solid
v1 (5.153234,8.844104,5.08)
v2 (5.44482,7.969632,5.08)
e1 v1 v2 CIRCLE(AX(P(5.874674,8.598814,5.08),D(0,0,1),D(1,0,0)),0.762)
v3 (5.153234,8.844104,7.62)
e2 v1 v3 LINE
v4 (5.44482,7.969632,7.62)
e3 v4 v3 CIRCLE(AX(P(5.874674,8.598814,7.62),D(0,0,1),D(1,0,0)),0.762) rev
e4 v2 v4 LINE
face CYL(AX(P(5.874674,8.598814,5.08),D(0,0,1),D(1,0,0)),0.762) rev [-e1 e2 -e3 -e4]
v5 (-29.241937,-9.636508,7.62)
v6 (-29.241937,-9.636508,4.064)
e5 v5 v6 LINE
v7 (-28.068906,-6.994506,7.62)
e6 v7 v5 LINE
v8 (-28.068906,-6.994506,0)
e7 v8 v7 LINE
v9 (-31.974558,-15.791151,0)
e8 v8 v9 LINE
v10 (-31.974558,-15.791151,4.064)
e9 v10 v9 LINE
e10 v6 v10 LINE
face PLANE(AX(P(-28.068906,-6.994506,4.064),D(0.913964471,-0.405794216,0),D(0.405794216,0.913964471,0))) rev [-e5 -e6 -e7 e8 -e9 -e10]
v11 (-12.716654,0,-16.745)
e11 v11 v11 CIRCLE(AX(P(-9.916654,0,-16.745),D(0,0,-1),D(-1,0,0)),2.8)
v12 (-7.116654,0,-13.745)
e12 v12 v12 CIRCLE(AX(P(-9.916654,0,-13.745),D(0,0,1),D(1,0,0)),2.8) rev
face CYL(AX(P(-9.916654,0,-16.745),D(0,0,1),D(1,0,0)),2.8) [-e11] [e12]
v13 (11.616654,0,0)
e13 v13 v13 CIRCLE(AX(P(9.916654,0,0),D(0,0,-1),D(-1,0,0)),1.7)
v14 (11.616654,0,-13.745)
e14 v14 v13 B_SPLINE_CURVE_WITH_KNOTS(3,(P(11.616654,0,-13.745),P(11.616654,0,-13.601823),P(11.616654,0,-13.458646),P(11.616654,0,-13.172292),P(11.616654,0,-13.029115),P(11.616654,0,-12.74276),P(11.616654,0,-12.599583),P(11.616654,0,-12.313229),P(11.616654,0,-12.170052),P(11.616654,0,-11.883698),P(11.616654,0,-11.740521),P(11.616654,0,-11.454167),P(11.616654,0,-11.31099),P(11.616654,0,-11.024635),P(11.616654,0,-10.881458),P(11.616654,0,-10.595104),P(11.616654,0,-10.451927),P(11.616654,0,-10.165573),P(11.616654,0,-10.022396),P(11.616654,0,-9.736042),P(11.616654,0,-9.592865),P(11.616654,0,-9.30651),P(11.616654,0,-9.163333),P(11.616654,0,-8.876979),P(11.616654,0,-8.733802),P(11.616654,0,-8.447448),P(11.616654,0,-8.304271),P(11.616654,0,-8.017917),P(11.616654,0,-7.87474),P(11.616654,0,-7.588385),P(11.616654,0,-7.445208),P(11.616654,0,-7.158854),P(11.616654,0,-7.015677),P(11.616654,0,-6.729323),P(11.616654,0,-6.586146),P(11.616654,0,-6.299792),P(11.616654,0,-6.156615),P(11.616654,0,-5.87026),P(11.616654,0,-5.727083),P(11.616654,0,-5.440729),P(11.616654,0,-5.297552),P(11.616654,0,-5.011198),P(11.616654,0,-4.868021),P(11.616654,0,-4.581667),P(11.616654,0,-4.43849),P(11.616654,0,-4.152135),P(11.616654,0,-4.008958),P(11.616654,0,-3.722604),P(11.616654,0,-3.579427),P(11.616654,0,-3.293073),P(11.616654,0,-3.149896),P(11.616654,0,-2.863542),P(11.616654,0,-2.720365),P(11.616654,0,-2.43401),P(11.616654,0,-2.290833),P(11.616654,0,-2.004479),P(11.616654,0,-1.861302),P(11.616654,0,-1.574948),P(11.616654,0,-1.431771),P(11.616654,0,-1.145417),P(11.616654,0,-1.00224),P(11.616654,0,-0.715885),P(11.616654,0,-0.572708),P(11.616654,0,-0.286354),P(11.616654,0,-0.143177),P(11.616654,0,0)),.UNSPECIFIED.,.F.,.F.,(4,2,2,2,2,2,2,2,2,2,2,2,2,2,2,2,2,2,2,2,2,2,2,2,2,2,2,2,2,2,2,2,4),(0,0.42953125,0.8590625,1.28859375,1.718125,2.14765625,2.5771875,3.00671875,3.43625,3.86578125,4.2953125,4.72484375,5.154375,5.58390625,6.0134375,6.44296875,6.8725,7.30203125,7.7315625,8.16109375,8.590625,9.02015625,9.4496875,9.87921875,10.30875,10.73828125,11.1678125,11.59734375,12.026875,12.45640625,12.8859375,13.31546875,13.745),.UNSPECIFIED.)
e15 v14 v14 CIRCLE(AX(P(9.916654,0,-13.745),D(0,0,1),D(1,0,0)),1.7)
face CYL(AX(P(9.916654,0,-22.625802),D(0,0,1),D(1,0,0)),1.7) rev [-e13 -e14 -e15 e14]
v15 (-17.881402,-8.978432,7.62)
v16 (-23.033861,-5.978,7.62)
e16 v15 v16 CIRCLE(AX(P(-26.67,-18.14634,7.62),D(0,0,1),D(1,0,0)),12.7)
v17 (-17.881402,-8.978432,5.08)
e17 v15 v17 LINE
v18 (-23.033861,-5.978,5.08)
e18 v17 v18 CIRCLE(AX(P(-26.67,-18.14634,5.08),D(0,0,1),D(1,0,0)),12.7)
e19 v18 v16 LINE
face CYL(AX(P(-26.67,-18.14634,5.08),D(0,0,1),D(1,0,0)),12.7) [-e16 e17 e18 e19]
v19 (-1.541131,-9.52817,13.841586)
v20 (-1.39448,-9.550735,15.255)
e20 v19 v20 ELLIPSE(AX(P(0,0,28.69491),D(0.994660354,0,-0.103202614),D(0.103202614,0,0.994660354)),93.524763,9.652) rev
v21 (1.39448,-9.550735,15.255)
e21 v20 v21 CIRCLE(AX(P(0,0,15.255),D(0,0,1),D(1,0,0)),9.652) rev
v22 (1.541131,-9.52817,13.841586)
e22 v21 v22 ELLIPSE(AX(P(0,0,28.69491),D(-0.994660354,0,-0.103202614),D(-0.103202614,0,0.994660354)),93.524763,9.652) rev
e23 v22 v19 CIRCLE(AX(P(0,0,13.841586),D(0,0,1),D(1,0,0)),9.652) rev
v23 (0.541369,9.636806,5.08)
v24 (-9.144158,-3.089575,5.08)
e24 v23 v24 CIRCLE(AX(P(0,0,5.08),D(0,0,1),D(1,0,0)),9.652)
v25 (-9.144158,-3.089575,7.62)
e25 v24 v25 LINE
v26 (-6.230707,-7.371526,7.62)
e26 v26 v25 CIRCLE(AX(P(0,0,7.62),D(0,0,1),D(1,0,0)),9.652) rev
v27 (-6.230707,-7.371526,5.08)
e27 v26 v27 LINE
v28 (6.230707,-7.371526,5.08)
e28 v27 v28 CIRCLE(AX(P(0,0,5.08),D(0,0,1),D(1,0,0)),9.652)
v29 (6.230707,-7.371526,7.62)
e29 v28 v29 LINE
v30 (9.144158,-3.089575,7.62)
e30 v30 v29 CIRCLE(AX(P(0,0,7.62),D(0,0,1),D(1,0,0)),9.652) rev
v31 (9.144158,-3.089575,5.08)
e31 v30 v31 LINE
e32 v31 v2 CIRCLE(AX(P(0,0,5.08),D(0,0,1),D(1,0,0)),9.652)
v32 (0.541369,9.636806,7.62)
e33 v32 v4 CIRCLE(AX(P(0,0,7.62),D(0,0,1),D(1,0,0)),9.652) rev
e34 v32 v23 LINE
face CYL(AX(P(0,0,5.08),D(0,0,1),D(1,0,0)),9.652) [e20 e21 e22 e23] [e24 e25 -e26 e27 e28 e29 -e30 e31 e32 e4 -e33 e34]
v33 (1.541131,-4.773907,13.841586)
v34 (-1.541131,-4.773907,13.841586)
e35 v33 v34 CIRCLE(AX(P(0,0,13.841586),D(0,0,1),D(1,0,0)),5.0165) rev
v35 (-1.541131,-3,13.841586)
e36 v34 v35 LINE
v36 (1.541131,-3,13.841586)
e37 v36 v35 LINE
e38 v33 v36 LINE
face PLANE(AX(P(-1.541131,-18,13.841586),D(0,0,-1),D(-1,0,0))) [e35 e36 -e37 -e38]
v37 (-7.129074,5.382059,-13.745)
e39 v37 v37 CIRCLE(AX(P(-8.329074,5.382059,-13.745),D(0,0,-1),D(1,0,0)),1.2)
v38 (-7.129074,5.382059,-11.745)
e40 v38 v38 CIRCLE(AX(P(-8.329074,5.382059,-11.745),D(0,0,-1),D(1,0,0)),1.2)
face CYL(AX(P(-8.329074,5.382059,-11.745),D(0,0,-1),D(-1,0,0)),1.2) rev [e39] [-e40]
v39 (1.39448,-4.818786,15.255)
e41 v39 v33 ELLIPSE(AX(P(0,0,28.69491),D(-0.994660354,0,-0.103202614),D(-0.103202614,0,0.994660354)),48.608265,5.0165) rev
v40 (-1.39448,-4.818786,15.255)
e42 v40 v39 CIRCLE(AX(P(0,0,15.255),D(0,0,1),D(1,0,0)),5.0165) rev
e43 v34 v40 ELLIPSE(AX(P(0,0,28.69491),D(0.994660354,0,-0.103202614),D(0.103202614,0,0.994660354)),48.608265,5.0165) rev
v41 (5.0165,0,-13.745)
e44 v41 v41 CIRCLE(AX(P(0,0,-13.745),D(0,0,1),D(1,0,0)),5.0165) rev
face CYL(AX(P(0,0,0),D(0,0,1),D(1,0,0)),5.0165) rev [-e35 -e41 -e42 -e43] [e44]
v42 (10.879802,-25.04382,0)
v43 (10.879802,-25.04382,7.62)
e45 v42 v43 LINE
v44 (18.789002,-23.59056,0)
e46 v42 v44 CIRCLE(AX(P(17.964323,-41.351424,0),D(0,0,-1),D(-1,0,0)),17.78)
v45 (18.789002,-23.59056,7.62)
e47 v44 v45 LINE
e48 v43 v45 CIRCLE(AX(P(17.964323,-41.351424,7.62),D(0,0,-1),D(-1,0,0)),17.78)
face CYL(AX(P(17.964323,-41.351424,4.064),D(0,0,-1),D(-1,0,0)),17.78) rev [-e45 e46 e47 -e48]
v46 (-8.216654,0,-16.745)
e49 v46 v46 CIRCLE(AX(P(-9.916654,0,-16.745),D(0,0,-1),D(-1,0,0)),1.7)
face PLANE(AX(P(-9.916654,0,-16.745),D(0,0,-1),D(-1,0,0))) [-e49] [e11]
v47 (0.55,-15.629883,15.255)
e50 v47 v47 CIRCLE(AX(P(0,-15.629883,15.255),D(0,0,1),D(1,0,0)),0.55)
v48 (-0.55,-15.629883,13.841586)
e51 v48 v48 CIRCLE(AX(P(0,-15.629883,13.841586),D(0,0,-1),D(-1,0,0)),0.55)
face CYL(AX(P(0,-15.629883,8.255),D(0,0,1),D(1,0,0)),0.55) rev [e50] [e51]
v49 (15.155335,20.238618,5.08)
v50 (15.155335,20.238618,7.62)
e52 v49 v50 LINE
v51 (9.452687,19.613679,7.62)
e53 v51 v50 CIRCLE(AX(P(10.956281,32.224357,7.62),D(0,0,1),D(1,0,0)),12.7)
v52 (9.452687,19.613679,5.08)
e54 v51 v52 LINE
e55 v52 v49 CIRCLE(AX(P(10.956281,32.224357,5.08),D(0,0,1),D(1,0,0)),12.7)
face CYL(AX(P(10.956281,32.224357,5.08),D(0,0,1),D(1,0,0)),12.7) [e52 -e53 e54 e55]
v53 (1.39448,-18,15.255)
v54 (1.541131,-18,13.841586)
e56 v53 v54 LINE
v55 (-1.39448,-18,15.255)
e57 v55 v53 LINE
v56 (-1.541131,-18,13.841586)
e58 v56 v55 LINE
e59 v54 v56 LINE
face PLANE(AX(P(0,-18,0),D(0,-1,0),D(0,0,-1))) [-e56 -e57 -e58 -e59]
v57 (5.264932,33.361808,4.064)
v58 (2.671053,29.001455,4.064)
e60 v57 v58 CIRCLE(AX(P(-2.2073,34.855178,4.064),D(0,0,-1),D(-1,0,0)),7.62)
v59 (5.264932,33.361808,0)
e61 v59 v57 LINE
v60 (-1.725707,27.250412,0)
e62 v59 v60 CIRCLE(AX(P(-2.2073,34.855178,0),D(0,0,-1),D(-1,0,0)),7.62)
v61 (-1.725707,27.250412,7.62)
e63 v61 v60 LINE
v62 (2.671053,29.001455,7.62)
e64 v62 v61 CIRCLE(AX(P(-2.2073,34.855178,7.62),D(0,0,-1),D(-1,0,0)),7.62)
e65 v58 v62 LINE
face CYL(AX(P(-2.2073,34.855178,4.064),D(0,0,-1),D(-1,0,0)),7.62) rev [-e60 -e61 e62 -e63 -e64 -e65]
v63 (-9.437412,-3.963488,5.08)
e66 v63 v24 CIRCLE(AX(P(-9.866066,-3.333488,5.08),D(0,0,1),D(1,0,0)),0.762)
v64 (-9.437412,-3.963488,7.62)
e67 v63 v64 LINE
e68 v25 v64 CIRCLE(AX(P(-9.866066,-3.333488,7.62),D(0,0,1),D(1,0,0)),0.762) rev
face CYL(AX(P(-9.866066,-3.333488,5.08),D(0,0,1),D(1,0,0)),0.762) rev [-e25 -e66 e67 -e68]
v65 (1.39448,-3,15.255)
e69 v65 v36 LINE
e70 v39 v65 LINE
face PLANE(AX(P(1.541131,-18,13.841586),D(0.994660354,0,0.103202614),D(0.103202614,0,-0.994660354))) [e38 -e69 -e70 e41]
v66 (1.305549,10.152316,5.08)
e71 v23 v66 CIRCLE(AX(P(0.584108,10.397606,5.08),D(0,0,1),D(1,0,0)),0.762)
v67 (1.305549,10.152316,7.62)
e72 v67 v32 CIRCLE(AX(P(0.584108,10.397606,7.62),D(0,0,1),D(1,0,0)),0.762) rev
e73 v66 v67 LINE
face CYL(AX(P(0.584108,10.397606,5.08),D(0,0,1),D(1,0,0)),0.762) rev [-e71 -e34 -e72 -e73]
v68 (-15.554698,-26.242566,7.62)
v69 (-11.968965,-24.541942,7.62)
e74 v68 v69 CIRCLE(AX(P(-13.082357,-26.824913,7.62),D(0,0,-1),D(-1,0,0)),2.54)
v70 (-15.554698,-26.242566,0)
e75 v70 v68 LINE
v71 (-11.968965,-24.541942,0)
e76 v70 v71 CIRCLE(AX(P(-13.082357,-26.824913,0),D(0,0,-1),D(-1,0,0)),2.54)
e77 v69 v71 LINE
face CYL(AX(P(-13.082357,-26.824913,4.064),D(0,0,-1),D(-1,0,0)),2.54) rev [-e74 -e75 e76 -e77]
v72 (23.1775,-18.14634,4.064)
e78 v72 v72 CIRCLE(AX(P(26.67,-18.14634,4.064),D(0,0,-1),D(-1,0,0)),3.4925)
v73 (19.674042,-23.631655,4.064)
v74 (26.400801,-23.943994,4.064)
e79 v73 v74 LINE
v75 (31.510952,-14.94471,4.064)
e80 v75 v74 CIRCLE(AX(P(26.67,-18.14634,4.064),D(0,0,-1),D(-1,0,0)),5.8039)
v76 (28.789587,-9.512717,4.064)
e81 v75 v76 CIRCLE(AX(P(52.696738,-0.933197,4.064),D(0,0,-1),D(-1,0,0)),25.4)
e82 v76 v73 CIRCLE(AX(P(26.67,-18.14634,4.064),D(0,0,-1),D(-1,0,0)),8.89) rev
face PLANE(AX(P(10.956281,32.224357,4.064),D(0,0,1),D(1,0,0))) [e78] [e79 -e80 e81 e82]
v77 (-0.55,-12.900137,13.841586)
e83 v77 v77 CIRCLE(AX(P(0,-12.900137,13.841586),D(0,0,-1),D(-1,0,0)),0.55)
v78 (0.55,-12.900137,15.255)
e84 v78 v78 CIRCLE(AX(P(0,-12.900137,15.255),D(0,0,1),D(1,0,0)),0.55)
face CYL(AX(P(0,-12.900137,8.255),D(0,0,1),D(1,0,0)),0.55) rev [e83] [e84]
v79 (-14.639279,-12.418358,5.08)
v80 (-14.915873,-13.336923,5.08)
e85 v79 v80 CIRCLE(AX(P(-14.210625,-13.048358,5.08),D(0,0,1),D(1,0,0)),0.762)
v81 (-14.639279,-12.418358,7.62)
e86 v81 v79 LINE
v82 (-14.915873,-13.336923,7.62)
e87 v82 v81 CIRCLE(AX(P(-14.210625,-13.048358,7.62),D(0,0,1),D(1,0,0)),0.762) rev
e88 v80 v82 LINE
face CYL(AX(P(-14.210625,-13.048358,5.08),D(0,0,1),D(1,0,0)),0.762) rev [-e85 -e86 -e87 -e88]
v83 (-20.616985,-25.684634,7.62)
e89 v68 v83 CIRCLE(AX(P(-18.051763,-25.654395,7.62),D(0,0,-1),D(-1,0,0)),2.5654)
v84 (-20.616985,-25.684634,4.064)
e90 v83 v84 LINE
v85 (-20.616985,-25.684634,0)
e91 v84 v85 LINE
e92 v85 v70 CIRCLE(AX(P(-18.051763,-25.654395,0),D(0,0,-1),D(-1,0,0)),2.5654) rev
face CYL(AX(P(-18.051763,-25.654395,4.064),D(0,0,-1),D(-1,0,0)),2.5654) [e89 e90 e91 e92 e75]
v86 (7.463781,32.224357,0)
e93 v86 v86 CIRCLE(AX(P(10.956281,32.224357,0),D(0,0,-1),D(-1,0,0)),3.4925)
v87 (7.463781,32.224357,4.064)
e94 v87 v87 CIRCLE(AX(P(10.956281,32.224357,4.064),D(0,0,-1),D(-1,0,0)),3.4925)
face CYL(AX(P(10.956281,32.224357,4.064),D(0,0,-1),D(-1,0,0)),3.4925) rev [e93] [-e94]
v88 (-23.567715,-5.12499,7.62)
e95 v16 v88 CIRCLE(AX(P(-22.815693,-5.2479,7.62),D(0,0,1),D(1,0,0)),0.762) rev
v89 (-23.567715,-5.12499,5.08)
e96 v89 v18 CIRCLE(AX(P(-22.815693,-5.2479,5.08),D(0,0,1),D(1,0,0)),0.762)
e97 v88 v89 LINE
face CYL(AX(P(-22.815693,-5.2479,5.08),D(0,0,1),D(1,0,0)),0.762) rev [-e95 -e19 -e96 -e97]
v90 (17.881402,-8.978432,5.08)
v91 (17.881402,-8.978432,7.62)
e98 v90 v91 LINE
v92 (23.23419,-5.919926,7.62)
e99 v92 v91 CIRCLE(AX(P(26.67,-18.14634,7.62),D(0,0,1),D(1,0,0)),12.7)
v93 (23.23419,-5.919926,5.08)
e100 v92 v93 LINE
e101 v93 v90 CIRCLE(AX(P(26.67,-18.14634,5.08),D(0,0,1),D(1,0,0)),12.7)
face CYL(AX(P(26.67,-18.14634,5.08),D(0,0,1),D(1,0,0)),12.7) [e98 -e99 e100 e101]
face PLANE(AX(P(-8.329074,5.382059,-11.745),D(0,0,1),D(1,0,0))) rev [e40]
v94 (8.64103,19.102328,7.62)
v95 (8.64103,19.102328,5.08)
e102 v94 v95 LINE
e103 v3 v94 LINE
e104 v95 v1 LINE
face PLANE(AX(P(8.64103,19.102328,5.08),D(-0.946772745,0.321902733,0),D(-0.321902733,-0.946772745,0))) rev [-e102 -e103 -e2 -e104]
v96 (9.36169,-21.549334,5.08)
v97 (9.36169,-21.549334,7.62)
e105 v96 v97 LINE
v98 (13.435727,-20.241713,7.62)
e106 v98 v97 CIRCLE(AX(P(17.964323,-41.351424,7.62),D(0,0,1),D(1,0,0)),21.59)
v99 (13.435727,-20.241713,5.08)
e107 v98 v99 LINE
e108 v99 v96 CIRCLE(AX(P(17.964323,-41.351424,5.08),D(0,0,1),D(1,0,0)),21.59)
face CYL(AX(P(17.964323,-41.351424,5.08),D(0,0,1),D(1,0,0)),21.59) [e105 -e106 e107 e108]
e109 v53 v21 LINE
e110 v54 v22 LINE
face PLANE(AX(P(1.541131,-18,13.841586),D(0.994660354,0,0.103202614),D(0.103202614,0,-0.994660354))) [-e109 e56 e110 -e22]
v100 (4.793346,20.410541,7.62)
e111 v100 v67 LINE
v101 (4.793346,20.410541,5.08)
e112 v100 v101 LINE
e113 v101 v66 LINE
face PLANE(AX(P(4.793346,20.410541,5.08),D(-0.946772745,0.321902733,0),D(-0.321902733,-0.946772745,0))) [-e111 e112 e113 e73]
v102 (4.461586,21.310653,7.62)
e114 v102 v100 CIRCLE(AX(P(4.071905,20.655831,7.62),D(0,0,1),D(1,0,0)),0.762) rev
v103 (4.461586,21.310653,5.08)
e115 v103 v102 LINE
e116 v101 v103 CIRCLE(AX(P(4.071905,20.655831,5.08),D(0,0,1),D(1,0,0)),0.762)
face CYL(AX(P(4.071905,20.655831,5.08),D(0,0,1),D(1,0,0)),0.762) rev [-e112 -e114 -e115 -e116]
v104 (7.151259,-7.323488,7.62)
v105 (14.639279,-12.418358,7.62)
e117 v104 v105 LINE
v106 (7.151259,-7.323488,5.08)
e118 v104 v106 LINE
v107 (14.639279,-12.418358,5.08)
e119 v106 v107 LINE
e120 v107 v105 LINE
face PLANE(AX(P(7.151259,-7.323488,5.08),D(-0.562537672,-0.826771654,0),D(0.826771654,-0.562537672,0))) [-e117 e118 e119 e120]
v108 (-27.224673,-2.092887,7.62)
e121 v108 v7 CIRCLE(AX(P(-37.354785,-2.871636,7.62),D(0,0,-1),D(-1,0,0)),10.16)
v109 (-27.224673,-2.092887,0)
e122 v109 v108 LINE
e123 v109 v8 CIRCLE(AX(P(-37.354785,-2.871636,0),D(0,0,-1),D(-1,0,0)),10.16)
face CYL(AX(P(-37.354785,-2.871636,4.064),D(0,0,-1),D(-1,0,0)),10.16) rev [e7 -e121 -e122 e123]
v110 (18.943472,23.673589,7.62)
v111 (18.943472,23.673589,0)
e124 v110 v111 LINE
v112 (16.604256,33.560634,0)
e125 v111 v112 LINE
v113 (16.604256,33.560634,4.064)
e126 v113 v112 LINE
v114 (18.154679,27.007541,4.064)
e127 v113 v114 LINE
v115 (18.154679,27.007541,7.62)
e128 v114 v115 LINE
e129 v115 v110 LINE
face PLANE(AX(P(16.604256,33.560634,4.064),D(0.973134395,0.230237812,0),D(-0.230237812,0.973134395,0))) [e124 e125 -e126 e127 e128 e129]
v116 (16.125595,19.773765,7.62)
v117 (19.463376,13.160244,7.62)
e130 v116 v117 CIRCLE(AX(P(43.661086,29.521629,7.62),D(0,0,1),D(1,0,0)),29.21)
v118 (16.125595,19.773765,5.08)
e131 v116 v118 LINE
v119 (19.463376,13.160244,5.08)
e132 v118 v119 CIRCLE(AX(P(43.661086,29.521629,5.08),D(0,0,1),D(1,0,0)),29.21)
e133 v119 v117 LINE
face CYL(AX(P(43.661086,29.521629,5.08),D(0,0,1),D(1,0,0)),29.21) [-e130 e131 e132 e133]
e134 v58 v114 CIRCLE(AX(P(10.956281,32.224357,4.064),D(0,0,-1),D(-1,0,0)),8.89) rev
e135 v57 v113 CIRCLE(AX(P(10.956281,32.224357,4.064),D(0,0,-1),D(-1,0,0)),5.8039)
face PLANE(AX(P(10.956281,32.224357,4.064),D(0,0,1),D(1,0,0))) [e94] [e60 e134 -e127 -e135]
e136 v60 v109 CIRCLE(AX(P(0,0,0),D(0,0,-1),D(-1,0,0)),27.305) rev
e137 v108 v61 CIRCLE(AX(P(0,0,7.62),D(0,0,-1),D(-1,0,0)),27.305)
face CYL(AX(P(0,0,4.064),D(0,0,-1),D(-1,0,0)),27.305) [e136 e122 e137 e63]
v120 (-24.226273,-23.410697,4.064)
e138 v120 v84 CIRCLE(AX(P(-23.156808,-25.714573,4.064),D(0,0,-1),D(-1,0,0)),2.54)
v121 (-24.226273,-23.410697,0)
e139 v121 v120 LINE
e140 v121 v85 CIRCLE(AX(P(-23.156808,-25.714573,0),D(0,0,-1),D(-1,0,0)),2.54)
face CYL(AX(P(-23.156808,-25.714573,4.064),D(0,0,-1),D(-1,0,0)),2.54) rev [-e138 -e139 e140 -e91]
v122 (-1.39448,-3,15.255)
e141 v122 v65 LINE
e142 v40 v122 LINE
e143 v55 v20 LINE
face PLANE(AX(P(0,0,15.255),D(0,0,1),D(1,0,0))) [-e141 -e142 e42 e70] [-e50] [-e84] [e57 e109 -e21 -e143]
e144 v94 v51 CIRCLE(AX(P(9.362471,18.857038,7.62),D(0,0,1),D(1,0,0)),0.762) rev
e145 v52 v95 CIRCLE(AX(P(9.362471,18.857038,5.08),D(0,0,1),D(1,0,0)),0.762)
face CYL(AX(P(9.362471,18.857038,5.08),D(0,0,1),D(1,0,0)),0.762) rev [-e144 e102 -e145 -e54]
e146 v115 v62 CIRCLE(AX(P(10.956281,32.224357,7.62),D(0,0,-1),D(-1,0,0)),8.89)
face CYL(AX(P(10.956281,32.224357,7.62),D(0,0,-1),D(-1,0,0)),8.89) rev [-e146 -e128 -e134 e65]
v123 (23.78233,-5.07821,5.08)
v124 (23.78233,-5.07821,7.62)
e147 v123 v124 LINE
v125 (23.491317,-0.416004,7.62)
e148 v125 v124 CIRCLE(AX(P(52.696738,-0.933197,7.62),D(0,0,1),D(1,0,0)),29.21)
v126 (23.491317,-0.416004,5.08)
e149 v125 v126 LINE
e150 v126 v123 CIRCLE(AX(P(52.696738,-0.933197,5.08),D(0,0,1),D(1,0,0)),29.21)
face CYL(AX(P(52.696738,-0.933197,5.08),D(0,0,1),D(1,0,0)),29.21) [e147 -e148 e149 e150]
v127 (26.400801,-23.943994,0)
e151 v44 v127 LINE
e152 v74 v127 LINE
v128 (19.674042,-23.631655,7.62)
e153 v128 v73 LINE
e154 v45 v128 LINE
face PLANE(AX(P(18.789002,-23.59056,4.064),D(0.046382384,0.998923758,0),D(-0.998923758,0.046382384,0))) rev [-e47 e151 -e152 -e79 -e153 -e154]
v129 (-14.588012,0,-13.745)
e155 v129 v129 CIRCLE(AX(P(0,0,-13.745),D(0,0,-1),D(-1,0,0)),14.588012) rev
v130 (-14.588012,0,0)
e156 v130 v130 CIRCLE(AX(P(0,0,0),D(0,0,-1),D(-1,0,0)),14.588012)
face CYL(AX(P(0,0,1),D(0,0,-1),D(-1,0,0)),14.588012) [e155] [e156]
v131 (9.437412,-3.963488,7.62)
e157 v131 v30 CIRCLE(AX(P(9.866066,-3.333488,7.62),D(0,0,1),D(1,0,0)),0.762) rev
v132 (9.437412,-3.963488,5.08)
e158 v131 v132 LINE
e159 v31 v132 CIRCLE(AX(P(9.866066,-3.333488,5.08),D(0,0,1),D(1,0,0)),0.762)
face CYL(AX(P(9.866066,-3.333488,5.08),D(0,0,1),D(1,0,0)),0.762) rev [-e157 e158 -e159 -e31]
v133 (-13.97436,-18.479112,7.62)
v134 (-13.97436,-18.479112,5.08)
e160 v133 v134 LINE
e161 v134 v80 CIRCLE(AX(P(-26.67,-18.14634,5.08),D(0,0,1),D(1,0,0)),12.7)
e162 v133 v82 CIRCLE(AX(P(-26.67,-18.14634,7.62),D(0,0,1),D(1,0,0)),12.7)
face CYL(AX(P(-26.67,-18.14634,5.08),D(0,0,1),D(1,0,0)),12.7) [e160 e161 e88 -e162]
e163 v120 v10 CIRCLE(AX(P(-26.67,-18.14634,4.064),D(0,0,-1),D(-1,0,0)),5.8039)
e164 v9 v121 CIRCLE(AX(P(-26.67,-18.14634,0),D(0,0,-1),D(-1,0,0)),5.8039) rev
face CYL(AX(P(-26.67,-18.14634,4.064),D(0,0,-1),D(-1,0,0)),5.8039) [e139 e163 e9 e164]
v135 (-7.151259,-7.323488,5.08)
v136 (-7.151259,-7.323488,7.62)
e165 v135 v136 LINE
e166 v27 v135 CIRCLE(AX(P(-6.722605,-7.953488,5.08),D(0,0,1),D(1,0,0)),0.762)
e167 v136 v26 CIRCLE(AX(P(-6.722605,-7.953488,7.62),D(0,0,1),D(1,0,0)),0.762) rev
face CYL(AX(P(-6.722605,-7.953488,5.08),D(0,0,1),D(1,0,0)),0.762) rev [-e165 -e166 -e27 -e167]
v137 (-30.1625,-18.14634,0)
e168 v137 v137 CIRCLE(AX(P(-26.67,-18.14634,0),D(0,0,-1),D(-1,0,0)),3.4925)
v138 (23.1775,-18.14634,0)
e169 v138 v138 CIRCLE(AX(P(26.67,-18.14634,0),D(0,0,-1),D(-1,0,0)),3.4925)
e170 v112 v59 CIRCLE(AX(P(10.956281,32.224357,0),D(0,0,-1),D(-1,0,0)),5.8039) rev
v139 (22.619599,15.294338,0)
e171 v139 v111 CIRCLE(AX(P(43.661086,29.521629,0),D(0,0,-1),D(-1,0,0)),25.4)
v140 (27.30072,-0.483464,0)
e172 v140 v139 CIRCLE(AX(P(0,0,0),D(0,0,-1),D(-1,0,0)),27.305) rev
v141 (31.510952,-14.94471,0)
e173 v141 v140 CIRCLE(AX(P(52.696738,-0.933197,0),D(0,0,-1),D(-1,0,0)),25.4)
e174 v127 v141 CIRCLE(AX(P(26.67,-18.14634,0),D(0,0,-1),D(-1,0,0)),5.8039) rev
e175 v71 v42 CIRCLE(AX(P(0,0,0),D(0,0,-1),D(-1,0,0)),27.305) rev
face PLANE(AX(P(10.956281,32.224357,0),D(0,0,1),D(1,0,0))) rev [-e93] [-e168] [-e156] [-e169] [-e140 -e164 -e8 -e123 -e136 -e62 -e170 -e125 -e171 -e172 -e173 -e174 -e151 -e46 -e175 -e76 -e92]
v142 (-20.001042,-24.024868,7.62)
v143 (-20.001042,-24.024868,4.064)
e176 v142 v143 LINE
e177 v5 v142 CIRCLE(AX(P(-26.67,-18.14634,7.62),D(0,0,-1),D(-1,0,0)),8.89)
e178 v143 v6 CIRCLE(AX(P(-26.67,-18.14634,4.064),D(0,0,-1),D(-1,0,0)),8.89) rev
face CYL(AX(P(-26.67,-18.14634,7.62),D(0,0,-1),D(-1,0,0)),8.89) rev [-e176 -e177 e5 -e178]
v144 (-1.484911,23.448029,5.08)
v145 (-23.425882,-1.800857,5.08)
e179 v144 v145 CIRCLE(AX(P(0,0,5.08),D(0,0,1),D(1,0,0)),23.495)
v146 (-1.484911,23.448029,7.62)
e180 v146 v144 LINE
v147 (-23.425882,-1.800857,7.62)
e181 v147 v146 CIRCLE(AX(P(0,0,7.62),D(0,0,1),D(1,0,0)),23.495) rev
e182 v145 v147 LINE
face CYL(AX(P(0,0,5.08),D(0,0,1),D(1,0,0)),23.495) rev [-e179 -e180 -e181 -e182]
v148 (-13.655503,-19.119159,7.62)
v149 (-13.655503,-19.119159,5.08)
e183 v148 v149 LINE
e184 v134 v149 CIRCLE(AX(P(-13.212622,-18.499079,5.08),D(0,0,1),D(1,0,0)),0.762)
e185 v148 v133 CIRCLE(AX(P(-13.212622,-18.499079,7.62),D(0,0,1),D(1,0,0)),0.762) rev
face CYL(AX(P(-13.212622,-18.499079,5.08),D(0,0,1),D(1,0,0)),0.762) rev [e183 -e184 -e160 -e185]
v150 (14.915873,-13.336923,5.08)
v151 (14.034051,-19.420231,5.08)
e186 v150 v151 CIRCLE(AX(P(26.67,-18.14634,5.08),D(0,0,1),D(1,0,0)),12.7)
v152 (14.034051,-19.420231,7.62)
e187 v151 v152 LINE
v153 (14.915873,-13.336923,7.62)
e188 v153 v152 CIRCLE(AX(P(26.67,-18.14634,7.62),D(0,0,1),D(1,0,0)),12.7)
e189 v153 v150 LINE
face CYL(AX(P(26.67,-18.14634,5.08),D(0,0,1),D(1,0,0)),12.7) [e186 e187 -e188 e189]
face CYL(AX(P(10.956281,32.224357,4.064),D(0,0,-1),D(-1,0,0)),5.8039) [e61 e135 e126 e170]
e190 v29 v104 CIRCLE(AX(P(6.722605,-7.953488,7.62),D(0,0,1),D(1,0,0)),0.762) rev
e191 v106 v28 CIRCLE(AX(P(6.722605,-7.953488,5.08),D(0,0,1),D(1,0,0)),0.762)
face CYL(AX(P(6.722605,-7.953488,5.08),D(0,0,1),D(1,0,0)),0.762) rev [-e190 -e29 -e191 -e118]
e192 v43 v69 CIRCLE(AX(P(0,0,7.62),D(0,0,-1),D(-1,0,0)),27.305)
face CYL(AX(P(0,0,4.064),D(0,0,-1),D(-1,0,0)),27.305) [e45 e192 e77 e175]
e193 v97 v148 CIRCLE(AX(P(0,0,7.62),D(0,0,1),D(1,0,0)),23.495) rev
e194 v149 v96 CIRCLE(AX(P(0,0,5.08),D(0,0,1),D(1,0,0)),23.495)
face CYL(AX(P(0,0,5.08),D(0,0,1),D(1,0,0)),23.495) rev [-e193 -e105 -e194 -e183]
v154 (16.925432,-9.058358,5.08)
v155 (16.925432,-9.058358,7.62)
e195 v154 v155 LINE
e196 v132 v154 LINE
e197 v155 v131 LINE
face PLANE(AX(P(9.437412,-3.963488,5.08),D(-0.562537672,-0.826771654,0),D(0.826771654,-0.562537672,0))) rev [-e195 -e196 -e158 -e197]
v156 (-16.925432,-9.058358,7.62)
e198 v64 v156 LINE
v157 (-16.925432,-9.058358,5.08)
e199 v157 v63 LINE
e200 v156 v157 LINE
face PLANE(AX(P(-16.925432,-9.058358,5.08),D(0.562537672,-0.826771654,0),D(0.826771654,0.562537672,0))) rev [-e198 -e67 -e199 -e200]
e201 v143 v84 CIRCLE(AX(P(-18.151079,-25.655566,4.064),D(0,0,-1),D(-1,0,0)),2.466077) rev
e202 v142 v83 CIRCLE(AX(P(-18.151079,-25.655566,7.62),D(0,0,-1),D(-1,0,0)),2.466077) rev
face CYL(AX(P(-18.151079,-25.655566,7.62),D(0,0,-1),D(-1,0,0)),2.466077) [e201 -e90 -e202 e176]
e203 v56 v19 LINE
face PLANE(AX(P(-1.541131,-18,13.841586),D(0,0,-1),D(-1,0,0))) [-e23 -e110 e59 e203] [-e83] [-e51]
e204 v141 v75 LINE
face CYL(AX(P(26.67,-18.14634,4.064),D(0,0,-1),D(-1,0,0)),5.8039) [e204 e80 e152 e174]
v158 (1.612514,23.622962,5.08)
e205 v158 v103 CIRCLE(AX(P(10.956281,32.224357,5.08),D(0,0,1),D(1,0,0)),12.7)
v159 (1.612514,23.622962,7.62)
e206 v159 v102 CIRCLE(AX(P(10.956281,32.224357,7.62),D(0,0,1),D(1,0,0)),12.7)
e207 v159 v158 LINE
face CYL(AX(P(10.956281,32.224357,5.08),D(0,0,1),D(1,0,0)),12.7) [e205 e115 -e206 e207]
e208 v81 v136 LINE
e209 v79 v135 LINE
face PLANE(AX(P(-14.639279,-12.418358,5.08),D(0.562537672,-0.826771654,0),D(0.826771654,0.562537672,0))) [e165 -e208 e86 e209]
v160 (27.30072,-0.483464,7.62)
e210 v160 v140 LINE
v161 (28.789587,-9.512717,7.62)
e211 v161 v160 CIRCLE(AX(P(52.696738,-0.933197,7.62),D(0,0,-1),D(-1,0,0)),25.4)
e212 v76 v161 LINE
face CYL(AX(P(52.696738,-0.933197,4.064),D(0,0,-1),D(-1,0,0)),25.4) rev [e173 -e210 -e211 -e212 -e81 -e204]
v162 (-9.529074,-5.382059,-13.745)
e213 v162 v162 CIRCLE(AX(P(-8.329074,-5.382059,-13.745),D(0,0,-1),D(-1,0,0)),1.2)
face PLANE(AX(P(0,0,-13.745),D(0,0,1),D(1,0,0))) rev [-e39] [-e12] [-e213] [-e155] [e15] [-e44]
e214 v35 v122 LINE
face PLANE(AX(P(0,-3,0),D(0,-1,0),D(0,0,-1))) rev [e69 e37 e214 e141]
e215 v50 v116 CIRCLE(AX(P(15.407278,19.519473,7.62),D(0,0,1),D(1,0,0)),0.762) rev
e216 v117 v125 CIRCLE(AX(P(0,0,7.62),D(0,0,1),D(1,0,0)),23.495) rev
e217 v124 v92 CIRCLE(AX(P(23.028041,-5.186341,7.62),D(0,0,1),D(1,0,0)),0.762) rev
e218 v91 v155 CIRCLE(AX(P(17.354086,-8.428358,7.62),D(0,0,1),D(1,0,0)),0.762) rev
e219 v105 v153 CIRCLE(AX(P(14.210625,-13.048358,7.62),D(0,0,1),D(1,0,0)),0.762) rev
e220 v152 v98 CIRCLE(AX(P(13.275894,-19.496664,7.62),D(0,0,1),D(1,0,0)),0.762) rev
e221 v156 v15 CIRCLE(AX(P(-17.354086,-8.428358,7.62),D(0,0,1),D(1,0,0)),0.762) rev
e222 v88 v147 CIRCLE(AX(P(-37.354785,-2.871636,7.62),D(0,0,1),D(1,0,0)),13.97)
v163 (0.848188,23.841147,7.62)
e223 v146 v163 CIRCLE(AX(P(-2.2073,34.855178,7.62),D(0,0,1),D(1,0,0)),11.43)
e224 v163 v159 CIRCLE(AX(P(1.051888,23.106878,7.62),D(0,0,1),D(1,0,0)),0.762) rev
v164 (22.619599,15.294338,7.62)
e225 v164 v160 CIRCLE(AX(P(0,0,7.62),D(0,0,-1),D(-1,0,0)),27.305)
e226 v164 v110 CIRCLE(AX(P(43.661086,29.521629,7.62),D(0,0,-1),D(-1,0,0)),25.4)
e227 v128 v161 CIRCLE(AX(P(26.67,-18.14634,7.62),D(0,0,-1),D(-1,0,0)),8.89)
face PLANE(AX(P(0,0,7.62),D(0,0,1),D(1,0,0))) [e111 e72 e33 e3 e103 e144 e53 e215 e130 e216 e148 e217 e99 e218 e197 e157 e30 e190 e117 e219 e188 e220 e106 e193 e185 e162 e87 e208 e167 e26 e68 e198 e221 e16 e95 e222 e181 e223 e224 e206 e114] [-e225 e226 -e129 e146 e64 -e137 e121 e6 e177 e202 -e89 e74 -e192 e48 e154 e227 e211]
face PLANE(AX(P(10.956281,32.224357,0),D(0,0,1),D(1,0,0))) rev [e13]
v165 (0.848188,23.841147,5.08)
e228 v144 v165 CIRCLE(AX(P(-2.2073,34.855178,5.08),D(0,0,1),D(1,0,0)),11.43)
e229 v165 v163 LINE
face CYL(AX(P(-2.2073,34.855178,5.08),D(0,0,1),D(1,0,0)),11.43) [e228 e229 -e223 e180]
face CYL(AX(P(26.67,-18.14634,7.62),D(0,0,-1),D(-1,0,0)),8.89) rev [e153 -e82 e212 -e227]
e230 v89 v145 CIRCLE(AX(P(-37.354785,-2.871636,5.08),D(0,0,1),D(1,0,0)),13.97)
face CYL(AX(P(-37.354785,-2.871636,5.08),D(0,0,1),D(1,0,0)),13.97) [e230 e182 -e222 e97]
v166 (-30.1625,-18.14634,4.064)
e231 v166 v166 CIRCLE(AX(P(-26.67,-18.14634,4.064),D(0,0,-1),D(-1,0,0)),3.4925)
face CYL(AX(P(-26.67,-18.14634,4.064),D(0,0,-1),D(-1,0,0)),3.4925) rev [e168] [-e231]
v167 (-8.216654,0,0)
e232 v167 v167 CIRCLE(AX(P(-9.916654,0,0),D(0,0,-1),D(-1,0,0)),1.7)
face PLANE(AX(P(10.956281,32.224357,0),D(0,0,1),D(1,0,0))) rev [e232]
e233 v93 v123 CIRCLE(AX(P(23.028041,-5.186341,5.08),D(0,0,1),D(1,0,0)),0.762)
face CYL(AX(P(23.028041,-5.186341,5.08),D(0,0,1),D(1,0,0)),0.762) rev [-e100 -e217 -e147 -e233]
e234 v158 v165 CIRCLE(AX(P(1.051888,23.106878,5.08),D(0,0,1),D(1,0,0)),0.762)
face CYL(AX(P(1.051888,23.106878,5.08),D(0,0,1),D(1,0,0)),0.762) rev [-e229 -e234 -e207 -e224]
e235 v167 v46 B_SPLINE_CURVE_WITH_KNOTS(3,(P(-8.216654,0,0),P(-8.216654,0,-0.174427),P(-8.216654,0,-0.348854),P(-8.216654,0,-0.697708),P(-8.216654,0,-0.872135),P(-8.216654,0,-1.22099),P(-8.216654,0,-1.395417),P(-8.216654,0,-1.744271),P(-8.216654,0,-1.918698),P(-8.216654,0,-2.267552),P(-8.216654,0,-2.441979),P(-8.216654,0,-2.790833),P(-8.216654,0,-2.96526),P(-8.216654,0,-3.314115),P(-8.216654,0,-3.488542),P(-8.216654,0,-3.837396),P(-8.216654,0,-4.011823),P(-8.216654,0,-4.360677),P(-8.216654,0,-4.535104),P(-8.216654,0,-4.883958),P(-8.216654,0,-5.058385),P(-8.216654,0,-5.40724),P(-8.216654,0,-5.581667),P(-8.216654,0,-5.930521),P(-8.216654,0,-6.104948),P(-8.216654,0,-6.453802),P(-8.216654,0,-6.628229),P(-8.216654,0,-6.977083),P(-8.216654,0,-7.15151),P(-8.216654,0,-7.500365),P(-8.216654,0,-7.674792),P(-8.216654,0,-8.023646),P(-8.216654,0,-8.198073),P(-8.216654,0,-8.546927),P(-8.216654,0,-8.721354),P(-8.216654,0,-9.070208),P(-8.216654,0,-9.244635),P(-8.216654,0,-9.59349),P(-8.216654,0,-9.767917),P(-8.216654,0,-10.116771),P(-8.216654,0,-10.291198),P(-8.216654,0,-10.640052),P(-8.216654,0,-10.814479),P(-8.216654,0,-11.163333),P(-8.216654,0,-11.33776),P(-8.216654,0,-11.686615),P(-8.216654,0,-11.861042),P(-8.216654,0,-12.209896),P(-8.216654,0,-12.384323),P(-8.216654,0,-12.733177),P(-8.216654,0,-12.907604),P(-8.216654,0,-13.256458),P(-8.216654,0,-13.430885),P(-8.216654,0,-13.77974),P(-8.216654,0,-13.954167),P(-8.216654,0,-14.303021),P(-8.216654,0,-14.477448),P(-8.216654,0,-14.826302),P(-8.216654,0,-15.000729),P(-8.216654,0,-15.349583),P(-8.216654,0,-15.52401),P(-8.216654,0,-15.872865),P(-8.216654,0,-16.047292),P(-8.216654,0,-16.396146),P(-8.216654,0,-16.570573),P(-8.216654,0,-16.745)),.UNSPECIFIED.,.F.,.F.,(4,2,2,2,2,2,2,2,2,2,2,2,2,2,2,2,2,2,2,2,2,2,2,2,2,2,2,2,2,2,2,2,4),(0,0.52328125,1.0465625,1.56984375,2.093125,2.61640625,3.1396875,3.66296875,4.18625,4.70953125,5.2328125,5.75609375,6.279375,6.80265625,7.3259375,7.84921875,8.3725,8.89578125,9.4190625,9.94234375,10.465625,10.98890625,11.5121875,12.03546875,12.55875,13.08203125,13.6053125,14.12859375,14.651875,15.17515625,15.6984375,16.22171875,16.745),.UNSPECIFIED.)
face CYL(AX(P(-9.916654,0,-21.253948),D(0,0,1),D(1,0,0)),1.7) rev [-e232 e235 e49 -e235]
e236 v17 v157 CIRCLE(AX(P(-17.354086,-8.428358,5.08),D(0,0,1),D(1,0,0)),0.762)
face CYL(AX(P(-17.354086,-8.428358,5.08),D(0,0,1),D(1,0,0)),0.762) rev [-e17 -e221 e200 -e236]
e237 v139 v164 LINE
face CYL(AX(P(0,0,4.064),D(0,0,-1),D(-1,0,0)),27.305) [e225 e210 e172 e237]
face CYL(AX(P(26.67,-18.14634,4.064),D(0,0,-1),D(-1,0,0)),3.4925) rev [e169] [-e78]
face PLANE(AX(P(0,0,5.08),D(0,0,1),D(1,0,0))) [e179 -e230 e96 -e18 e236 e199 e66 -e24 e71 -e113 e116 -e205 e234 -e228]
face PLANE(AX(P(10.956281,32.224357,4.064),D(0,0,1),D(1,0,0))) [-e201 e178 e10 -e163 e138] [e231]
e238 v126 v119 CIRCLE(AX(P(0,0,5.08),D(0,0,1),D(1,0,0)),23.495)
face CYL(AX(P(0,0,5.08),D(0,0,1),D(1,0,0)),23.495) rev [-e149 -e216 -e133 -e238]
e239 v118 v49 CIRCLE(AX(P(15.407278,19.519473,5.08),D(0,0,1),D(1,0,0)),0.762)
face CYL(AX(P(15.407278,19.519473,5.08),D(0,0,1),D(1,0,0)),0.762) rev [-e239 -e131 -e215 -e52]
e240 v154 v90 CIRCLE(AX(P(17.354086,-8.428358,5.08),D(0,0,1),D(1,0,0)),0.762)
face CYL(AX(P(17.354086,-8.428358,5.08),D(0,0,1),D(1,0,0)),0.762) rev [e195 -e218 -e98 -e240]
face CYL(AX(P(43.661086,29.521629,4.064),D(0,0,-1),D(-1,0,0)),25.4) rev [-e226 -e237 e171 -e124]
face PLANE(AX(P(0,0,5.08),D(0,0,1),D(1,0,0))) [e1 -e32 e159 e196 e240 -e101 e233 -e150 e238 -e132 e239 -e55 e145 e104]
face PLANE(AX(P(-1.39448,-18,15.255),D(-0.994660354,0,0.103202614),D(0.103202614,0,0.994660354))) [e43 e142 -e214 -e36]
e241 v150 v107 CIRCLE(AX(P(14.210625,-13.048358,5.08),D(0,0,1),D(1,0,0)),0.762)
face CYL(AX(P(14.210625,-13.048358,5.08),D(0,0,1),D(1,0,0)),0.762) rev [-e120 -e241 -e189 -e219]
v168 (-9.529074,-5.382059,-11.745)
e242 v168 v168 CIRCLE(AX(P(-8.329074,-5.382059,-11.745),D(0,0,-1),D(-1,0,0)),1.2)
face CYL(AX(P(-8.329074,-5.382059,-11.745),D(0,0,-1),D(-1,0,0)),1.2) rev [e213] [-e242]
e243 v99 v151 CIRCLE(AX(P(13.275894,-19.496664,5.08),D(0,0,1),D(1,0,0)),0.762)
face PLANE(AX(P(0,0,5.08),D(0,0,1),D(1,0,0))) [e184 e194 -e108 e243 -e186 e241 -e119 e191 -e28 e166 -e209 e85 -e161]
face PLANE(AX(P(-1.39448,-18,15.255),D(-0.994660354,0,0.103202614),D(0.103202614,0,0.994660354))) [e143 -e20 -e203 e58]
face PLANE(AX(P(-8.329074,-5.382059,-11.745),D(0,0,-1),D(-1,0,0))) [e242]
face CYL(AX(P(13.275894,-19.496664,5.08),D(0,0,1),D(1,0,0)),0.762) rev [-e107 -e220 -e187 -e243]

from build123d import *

# Parameters (mm, degrees)
EXTRUDE_START           = -5.08
EXTRUDE_1_OUTLINE_R     = 5.0165
EXTRUDE_1_DEPTH         = 5.08
EXTRUDE_1_2_OUTLINE_R   = 14.588011588
EXTRUDE_1_2_OUTLINE_R_2 = 2.268804718
EXTRUDE_1_2_OUTLINE_R_3 = 5.0165
EXTRUDE_1_2_OUTLINE_R_4 = 1.7
EXTRUDE_1_2_DEPTH       = 13.745
EXTRUDE_START_2         = -7.62
EXTRUDE_1_3_OUTLINE_R   = 5.0165
EXTRUDE_1_3_DEPTH       = 2.54
EXTRUDE_START_3         = -15.255
EXTRUDE_1_4_OUTLINE_R   = 9.652
EXTRUDE_1_4_OUTLINE_R_2 = 5.0165
EXTRUDE_1_4_DEPTH       = 7.635
EXTRUDE_START_4         = -4.064
EXTRUDE_1_5_OUTLINE_R   = 3.4925
EXTRUDE_1_5_DEPTH       = 4.064
SKETCH_2_R              = 3.139837575
SKETCH_2_R_2            = 1.7
EXTRUDE_2_DEPTH         = 13.745
SKETCH_3_R              = 1.2
CUT_EXTRUDE_1_DEPTH     = 2
SKETCH_4_R              = 2.8
SKETCH_4_R_2            = 1.7
EXTRUDE_3_DEPTH         = 3
CUT_EXTRUDE_2_DEPTH     = 11
EXTRUDE_4_DEPTH         = 7
EXTRUDE_4_DEPTH_BACK    = 8
SKETCH_8_R              = 0.55
CUT_EXTRUDE_3_DEPTH     = 7


with BuildPart() as part:
    # 凸台-拉伸1: read off the stored shape, not the designer's step
    # 凸台-拉伸1 outline → 凸台-拉伸1 (new body)
    with BuildSketch(Plane(origin=(0, 0, 0), x_dir=(-1, 0, 0), z_dir=(0, 0, -1)).offset(EXTRUDE_START)):
        with BuildLine():
            ThreePointArc((20.001041548, -24.024868384), (19.189851545, -13.342229592), (29.241937464, -9.636508412))
            Line((29.241937464, -9.636508412), (28.068905544, -6.994505511))
            ThreePointArc((28.068905544, -6.994505511), (27.342210837, -4.596155707), (27.224673499, -2.092887453))
            ThreePointArc((27.224673499, -2.092887453), (20.610396453, 17.910180989), (1.725707135, 27.250412105))
            ThreePointArc((1.725707135, 27.250412105), (-0.612060573, 27.775940536), (-2.671053319, 29.001455474))
            ThreePointArc((-2.671053319, 29.001455474), (-9.820841475, 23.407165066), (-18.154679086, 27.007540952))
            Line((-18.154679086, 27.007540952), (-18.943472312, 23.673588932))
            ThreePointArc((-18.943472312, 23.673588932), (-20.401103388, 19.31706117), (-22.619598737, 15.294338102))
            ThreePointArc((-22.619598737, 15.294338102), (-26.177171365, 7.766513011), (-27.300719551, -0.483463539))
            ThreePointArc((-27.300719551, -0.483463539), (-27.635164342, -5.065694963), (-28.789587413, -9.512717058))
            ThreePointArc((-28.789587413, -9.512717058), (-19.201342403, -13.324384855), (-19.674042111, -23.631654559))
            Line((-19.674042111, -23.631654559), (-18.789002246, -23.590560073))
            ThreePointArc((-18.789002246, -23.590560073), (-14.751162948, -23.864172006), (-10.879801534, -25.043820467))
            ThreePointArc((-10.879801534, -25.043820467), (0.599616353, -27.298415434), (11.968964894, -24.54194174))
            ThreePointArc((11.968964894, -24.54194174), (14.170803819, -24.529943899), (15.554698359, -26.242566013))
            ThreePointArc((15.554698359, -26.242566013), (18.332802908, -28.204355062), (20.616984936, -25.68463412))
            ThreePointArc((20.616984936, -25.68463412), (20.463088042, -24.797573692), (20.001041548, -24.024868384))
        make_face()
        Circle(EXTRUDE_1_OUTLINE_R, mode=Mode.SUBTRACT)
    extrude(amount=EXTRUDE_1_DEPTH)

    # Extrude 1 2 outline → Extrude 1 2 (add)
    with BuildSketch(Plane(origin=(0, 0, 0), x_dir=(-1, 0, 0), z_dir=(0, 0, -1))):
        Circle(EXTRUDE_1_2_OUTLINE_R)
        with Locations((-9.916654285, 0)):
            Circle(EXTRUDE_1_2_OUTLINE_R_2, mode=Mode.SUBTRACT)
        Circle(EXTRUDE_1_2_OUTLINE_R_3, mode=Mode.SUBTRACT)
        with Locations((9.916654285, 0)):
            Circle(EXTRUDE_1_2_OUTLINE_R_4, mode=Mode.SUBTRACT)
    extrude(amount=EXTRUDE_1_2_DEPTH)

    # Extrude 1 3 outline → Extrude 1 3 (add)
    with BuildSketch(Plane(origin=(0, 0, 0), x_dir=(-1, 0, 0), z_dir=(0, 0, -1)).offset(EXTRUDE_START_2)):
        with BuildLine():
            ThreePointArc((20.001041548, -24.024868384), (19.189851545, -13.342229592), (29.241937464, -9.636508412))
            Line((29.241937464, -9.636508412), (28.068905544, -6.994505511))
            ThreePointArc((28.068905544, -6.994505511), (27.342210837, -4.596155707), (27.224673499, -2.092887453))
            ThreePointArc((27.224673499, -2.092887453), (20.610396453, 17.910180989), (1.725707135, 27.250412105))
            ThreePointArc((1.725707135, 27.250412105), (-0.612060573, 27.775940536), (-2.671053319, 29.001455474))
            ThreePointArc((-2.671053319, 29.001455474), (-9.820841475, 23.407165066), (-18.154679086, 27.007540952))
            Line((-18.154679086, 27.007540952), (-18.943472312, 23.673588932))
            ThreePointArc((-18.943472312, 23.673588932), (-20.401103388, 19.31706117), (-22.619598737, 15.294338102))
            ThreePointArc((-22.619598737, 15.294338102), (-26.177171365, 7.766513011), (-27.300719551, -0.483463539))
            ThreePointArc((-27.300719551, -0.483463539), (-27.635164342, -5.065694963), (-28.789587413, -9.512717058))
            ThreePointArc((-28.789587413, -9.512717058), (-19.201342403, -13.324384855), (-19.674042111, -23.631654559))
            Line((-19.674042111, -23.631654559), (-18.789002246, -23.590560073))
            ThreePointArc((-18.789002246, -23.590560073), (-14.751162948, -23.864172006), (-10.879801534, -25.043820467))
            ThreePointArc((-10.879801534, -25.043820467), (0.599616353, -27.298415434), (11.968964894, -24.54194174))
            ThreePointArc((11.968964894, -24.54194174), (14.170803819, -24.529943899), (15.554698359, -26.242566013))
            ThreePointArc((15.554698359, -26.242566013), (18.332802908, -28.204355062), (20.616984936, -25.68463412))
            ThreePointArc((20.616984936, -25.68463412), (20.463088042, -24.797573692), (20.001041548, -24.024868384))
        make_face()
        with BuildLine():
            Line((-9.437411967, -3.963488283), (-16.925432177, -9.058357516))
            ThreePointArc((-16.925432177, -9.058357516), (-17.41757272, -9.187708174), (-17.881401777, -8.978432009))
            ThreePointArc((-17.881401777, -8.978432009), (-20.369392498, -7.119448331), (-23.234189867, -5.919925851))
            ThreePointArc((-23.234189867, -5.919925851), (-23.66657971, -5.602168652), (-23.782330153, -5.07821021))
            ThreePointArc((-23.782330153, -5.07821021), (-23.543476187, -2.752933566), (-23.491316823, -0.41600351))
            ThreePointArc((-23.491316823, -0.41600351), (-22.524542802, 6.682813521), (-19.463375657, 13.160244413))
            ThreePointArc((-19.463375657, 13.160244413), (-17.583975546, 16.360762601), (-16.125595223, 19.773765426))
            ThreePointArc((-16.125595223, 19.773765426), (-15.736516696, 20.206674843), (-15.155334867, 20.23861769))
            ThreePointArc((-15.155334867, 20.23861769), (-12.339759376, 19.599936809), (-9.452686504, 19.613679036))
            ThreePointArc((-9.452686504, 19.613679036), (-8.956292025, 19.50175751), (-8.641029977, 19.102328233))
            Line((-8.641029977, 19.102328233), (-5.153233585, 8.844103551))
            ThreePointArc((-5.153233585, 8.844103551), (-5.151801591, 8.357776579), (-5.444820191, 7.96963218))
            ThreePointArc((-5.444820191, 7.96963218), (-9.153474063, 3.061864885), (-9.144158429, -3.089574506))
            ThreePointArc((-9.144158429, -3.089574506), (-9.143653777, -3.575903324), (-9.437411967, -3.963488283))
        make_face(mode=Mode.SUBTRACT)
        with BuildLine():
            ThreePointArc((-7.151258866, -7.323488283), (-6.682895498, -7.19252367), (-6.230707221, -7.371525726))
            ThreePointArc((-6.230707221, -7.371525726), (0, -9.652), (6.230707221, -7.371525726))
            ThreePointArc((6.230707221, -7.371525726), (6.682895498, -7.19252367), (7.151258866, -7.323488283))
            Line((7.151258866, -7.323488283), (14.639279076, -12.418357516))
            ThreePointArc((14.639279076, -12.418357516), (14.940264662, -12.828652024), (14.91587299, -13.336922575))
            ThreePointArc((14.91587299, -13.336922575), (14.177670379, -15.859049125), (13.97436048, -18.4791122))
            ThreePointArc((13.97436048, -18.4791122), (13.89467208, -18.838860561), (13.655503297, -19.119159362))
            ThreePointArc((13.655503297, -19.119159362), (2.466910188, -23.365131695), (-9.361689692, -21.54933389))
            ThreePointArc((-9.361689692, -21.54933389), (-11.36623515, -20.794349539), (-13.435727078, -20.241713106))
            ThreePointArc((-13.435727078, -20.241713106), (-13.891836222, -19.945284024), (-14.034051192, -19.420231022))
            ThreePointArc((-14.034051192, -19.420231022), (-14.101364036, -16.324420921), (-14.91587299, -13.336922575))
            ThreePointArc((-14.91587299, -13.336922575), (-14.940264662, -12.828652024), (-14.639279076, -12.418357516))
            Line((-14.639279076, -12.418357516), (-7.151258866, -7.323488283))
        make_face(mode=Mode.SUBTRACT)
        with BuildLine():
            Line((16.925432177, -9.058357516), (9.437411967, -3.963488283))
            ThreePointArc((9.437411967, -3.963488283), (9.143653777, -3.575903324), (9.144158429, -3.089574506))
            ThreePointArc((9.144158429, -3.089574506), (7.680637088, 5.845418541), (-0.541368686, 9.636805692))
            ThreePointArc((-0.541368686, 9.636805692), (-1.010249862, 9.765904167), (-1.30554915, 10.152316259))
            Line((-1.30554915, 10.152316259), (-4.793345542, 20.410540941))
            ThreePointArc((-4.793345542, 20.410540941), (-4.786886375, 20.919355432), (-4.461586411, 21.310653068))
            ThreePointArc((-4.461586411, 21.310653068), (-2.953099663, 22.36336928), (-1.612513688, 23.62296165))
            ThreePointArc((-1.612513688, 23.62296165), (-1.26105352, 23.839608177), (-0.848188408, 23.841146693))
            ThreePointArc((-0.848188408, 23.841146693), (0.308161985, 23.584056969), (1.484910791, 23.44802902))
            ThreePointArc((1.484910791, 23.44802902), (17.73452718, 15.411085967), (23.425881848, -1.800856645))
            ThreePointArc((23.425881848, -1.800856645), (23.397483591, -3.467160777), (23.567714628, -5.124989875))
            ThreePointArc((23.567714628, -5.124989875), (23.461621487, -5.65215236), (23.033860973, -5.978000458))
            ThreePointArc((23.033860973, -5.978000458), (20.279055523, -7.17155875), (17.881401777, -8.978432009))
            ThreePointArc((17.881401777, -8.978432009), (17.41757272, -9.187708174), (16.925432177, -9.058357516))
        make_face(mode=Mode.SUBTRACT)
        Circle(EXTRUDE_1_3_OUTLINE_R, mode=Mode.SUBTRACT)
    extrude(amount=EXTRUDE_1_3_DEPTH)

    # Extrude 1 4 outline → Extrude 1 4 (add)
    with BuildSketch(Plane(origin=(0, 0, 0), x_dir=(-1, 0, 0), z_dir=(0, 0, -1)).offset(EXTRUDE_START_3)):
        Circle(EXTRUDE_1_4_OUTLINE_R)
        Circle(EXTRUDE_1_4_OUTLINE_R_2, mode=Mode.SUBTRACT)
    extrude(amount=EXTRUDE_1_4_DEPTH)

    # Extrude 1 5 outline → Extrude 1 5 (add)
    # profile 1 of 3: a face of its own
    with BuildSketch(Plane(origin=(0, 0, 0), x_dir=(-1, 0, 0), z_dir=(0, 0, -1)).offset(EXTRUDE_START_4)):
        with BuildLine():
            Line((31.974558392, -15.791151184), (29.241937464, -9.636508412))
            ThreePointArc((29.241937464, -9.636508412), (19.189851545, -13.342229592), (20.001041548, -24.024868384))
            ThreePointArc((20.001041548, -24.024868384), (20.463088042, -24.797573692), (20.616984936, -25.68463412))
            ThreePointArc((20.616984936, -25.68463412), (21.802856471, -23.565523811), (24.226273175, -23.410697217))
            ThreePointArc((24.226273175, -23.410697217), (30.739454478, -22.284551863), (31.974558392, -15.791151184))
        make_face()
        with Locations((26.67, -18.146340237)):
            Circle(EXTRUDE_1_5_OUTLINE_R, mode=Mode.SUBTRACT)
    # profile 2 of 3: a face of its own
    with BuildSketch(Plane(origin=(0, 0, 0), x_dir=(-1, 0, 0), z_dir=(0, 0, -1)).offset(EXTRUDE_START_4)):
        with BuildLine():
            ThreePointArc((-18.154679086, 27.007540952), (-9.820841475, 23.407165066), (-2.671053319, 29.001455474))
            ThreePointArc((-2.671053319, 29.001455474), (-4.34154767, 30.95941179), (-5.264931729, 33.361807717))
            ThreePointArc((-5.264931729, 33.361807717), (-10.854529977, 38.027365143), (-16.604256141, 33.560634381))
            Line((-16.604256141, 33.560634381), (-18.154679086, 27.007540952))
        make_face()
        with Locations((-10.956281429, 32.224357143)):
            Circle(EXTRUDE_1_5_OUTLINE_R, mode=Mode.SUBTRACT)
    # profile 3 of 3: a face of its own
    with BuildSketch(Plane(origin=(0, 0, 0), x_dir=(-1, 0, 0), z_dir=(0, 0, -1)).offset(EXTRUDE_START_4)):
        with BuildLine():
            Line((-26.400801283, -23.943993837), (-19.674042111, -23.631654559))
            ThreePointArc((-19.674042111, -23.631654559), (-19.201342403, -13.324384855), (-28.789587413, -9.512717058))
            ThreePointArc((-28.789587413, -9.512717058), (-29.987271524, -12.310373526), (-31.510952034, -14.944709618))
            ThreePointArc((-31.510952034, -14.944709618), (-31.716980405, -21.01221602), (-26.400801283, -23.943993837))
        make_face()
        with Locations((-26.67, -18.146340237)):
            Circle(EXTRUDE_1_5_OUTLINE_R, mode=Mode.SUBTRACT)
    extrude(amount=EXTRUDE_1_5_DEPTH)

    # 草图2 → 凸台-拉伸2 (add)
    with BuildSketch(Plane(origin=(0, 0, 0), x_dir=(-1, 0, 0), z_dir=(0, 0, -1))):
        with Locations((-9.916654285, 0)):
            Circle(SKETCH_2_R)
        with Locations(Location((-9.916654285, 0, 0), (0, 0, 180))):
            Circle(SKETCH_2_R_2, mode=Mode.SUBTRACT)
    extrude(amount=EXTRUDE_2_DEPTH)

    # 草图3 → 切除-拉伸1 (cut)
    with BuildSketch(Plane(origin=(0, 0, -13.745), x_dir=(-1, 0, 0), z_dir=(0, 0, -1))):
        with Locations((8.32907413, -5.382058747)):
            Circle(SKETCH_3_R)
        with Locations(Location((8.32907413, 5.382058747, 0), (0, 0, 180))):
            Circle(SKETCH_3_R)
    extrude(amount=-CUT_EXTRUDE_1_DEPTH, mode=Mode.SUBTRACT)

    # 草图4 → 凸台-拉伸3 (add)
    with BuildSketch(Plane(origin=(0, 0, -13.745), x_dir=(-1, 0, 0), z_dir=(0, 0, -1))):
        with Locations(Location((9.916654285, 0, 0), (0, 0, 180))):
            Circle(SKETCH_4_R)
        with Locations(Location((9.916654285, 0, 0), (0, 0, 180))):
            Circle(SKETCH_4_R_2, mode=Mode.SUBTRACT)
    extrude(amount=EXTRUDE_3_DEPTH)

    # 草图6 → 切除-拉伸2 (cut)
    with BuildSketch(Plane(origin=(0, -10, 0), x_dir=(1, 0, 0), z_dir=(0, 1, 0))):
        Polygon((-1.359530584, -15.591838783), (-1.541130969, -13.841585593), (1.541130969, -13.841585593), (1.359530584, -15.591838783), align=None)
    extrude(amount=CUT_EXTRUDE_2_DEPTH, mode=Mode.SUBTRACT)

    # 草图7 → 凸台-拉伸4 (add, two sides: drawn at the far end of the back side and taken through both)
    with BuildSketch(Plane(origin=(0, -10, 0), x_dir=(1, 0, 0), z_dir=(0, 1, 0)).offset(-EXTRUDE_4_DEPTH_BACK)):
        Polygon((-1.541130969, -13.841585593), (1.541130969, -13.841585593), (1.394479843, -15.255), (-1.394479843, -15.255), align=None)
    extrude(amount=EXTRUDE_4_DEPTH + EXTRUDE_4_DEPTH_BACK)

    # 草图8 → 切除-拉伸3 (cut)
    with BuildSketch(Plane.XY.offset(15.255)):
        with Locations((0, -12.900137164)):
            Circle(SKETCH_8_R)
        with Locations((0, -15.629883201)):
            Circle(SKETCH_8_R)
    extrude(amount=-CUT_EXTRUDE_3_DEPTH, mode=Mode.SUBTRACT)


solid = part.part
